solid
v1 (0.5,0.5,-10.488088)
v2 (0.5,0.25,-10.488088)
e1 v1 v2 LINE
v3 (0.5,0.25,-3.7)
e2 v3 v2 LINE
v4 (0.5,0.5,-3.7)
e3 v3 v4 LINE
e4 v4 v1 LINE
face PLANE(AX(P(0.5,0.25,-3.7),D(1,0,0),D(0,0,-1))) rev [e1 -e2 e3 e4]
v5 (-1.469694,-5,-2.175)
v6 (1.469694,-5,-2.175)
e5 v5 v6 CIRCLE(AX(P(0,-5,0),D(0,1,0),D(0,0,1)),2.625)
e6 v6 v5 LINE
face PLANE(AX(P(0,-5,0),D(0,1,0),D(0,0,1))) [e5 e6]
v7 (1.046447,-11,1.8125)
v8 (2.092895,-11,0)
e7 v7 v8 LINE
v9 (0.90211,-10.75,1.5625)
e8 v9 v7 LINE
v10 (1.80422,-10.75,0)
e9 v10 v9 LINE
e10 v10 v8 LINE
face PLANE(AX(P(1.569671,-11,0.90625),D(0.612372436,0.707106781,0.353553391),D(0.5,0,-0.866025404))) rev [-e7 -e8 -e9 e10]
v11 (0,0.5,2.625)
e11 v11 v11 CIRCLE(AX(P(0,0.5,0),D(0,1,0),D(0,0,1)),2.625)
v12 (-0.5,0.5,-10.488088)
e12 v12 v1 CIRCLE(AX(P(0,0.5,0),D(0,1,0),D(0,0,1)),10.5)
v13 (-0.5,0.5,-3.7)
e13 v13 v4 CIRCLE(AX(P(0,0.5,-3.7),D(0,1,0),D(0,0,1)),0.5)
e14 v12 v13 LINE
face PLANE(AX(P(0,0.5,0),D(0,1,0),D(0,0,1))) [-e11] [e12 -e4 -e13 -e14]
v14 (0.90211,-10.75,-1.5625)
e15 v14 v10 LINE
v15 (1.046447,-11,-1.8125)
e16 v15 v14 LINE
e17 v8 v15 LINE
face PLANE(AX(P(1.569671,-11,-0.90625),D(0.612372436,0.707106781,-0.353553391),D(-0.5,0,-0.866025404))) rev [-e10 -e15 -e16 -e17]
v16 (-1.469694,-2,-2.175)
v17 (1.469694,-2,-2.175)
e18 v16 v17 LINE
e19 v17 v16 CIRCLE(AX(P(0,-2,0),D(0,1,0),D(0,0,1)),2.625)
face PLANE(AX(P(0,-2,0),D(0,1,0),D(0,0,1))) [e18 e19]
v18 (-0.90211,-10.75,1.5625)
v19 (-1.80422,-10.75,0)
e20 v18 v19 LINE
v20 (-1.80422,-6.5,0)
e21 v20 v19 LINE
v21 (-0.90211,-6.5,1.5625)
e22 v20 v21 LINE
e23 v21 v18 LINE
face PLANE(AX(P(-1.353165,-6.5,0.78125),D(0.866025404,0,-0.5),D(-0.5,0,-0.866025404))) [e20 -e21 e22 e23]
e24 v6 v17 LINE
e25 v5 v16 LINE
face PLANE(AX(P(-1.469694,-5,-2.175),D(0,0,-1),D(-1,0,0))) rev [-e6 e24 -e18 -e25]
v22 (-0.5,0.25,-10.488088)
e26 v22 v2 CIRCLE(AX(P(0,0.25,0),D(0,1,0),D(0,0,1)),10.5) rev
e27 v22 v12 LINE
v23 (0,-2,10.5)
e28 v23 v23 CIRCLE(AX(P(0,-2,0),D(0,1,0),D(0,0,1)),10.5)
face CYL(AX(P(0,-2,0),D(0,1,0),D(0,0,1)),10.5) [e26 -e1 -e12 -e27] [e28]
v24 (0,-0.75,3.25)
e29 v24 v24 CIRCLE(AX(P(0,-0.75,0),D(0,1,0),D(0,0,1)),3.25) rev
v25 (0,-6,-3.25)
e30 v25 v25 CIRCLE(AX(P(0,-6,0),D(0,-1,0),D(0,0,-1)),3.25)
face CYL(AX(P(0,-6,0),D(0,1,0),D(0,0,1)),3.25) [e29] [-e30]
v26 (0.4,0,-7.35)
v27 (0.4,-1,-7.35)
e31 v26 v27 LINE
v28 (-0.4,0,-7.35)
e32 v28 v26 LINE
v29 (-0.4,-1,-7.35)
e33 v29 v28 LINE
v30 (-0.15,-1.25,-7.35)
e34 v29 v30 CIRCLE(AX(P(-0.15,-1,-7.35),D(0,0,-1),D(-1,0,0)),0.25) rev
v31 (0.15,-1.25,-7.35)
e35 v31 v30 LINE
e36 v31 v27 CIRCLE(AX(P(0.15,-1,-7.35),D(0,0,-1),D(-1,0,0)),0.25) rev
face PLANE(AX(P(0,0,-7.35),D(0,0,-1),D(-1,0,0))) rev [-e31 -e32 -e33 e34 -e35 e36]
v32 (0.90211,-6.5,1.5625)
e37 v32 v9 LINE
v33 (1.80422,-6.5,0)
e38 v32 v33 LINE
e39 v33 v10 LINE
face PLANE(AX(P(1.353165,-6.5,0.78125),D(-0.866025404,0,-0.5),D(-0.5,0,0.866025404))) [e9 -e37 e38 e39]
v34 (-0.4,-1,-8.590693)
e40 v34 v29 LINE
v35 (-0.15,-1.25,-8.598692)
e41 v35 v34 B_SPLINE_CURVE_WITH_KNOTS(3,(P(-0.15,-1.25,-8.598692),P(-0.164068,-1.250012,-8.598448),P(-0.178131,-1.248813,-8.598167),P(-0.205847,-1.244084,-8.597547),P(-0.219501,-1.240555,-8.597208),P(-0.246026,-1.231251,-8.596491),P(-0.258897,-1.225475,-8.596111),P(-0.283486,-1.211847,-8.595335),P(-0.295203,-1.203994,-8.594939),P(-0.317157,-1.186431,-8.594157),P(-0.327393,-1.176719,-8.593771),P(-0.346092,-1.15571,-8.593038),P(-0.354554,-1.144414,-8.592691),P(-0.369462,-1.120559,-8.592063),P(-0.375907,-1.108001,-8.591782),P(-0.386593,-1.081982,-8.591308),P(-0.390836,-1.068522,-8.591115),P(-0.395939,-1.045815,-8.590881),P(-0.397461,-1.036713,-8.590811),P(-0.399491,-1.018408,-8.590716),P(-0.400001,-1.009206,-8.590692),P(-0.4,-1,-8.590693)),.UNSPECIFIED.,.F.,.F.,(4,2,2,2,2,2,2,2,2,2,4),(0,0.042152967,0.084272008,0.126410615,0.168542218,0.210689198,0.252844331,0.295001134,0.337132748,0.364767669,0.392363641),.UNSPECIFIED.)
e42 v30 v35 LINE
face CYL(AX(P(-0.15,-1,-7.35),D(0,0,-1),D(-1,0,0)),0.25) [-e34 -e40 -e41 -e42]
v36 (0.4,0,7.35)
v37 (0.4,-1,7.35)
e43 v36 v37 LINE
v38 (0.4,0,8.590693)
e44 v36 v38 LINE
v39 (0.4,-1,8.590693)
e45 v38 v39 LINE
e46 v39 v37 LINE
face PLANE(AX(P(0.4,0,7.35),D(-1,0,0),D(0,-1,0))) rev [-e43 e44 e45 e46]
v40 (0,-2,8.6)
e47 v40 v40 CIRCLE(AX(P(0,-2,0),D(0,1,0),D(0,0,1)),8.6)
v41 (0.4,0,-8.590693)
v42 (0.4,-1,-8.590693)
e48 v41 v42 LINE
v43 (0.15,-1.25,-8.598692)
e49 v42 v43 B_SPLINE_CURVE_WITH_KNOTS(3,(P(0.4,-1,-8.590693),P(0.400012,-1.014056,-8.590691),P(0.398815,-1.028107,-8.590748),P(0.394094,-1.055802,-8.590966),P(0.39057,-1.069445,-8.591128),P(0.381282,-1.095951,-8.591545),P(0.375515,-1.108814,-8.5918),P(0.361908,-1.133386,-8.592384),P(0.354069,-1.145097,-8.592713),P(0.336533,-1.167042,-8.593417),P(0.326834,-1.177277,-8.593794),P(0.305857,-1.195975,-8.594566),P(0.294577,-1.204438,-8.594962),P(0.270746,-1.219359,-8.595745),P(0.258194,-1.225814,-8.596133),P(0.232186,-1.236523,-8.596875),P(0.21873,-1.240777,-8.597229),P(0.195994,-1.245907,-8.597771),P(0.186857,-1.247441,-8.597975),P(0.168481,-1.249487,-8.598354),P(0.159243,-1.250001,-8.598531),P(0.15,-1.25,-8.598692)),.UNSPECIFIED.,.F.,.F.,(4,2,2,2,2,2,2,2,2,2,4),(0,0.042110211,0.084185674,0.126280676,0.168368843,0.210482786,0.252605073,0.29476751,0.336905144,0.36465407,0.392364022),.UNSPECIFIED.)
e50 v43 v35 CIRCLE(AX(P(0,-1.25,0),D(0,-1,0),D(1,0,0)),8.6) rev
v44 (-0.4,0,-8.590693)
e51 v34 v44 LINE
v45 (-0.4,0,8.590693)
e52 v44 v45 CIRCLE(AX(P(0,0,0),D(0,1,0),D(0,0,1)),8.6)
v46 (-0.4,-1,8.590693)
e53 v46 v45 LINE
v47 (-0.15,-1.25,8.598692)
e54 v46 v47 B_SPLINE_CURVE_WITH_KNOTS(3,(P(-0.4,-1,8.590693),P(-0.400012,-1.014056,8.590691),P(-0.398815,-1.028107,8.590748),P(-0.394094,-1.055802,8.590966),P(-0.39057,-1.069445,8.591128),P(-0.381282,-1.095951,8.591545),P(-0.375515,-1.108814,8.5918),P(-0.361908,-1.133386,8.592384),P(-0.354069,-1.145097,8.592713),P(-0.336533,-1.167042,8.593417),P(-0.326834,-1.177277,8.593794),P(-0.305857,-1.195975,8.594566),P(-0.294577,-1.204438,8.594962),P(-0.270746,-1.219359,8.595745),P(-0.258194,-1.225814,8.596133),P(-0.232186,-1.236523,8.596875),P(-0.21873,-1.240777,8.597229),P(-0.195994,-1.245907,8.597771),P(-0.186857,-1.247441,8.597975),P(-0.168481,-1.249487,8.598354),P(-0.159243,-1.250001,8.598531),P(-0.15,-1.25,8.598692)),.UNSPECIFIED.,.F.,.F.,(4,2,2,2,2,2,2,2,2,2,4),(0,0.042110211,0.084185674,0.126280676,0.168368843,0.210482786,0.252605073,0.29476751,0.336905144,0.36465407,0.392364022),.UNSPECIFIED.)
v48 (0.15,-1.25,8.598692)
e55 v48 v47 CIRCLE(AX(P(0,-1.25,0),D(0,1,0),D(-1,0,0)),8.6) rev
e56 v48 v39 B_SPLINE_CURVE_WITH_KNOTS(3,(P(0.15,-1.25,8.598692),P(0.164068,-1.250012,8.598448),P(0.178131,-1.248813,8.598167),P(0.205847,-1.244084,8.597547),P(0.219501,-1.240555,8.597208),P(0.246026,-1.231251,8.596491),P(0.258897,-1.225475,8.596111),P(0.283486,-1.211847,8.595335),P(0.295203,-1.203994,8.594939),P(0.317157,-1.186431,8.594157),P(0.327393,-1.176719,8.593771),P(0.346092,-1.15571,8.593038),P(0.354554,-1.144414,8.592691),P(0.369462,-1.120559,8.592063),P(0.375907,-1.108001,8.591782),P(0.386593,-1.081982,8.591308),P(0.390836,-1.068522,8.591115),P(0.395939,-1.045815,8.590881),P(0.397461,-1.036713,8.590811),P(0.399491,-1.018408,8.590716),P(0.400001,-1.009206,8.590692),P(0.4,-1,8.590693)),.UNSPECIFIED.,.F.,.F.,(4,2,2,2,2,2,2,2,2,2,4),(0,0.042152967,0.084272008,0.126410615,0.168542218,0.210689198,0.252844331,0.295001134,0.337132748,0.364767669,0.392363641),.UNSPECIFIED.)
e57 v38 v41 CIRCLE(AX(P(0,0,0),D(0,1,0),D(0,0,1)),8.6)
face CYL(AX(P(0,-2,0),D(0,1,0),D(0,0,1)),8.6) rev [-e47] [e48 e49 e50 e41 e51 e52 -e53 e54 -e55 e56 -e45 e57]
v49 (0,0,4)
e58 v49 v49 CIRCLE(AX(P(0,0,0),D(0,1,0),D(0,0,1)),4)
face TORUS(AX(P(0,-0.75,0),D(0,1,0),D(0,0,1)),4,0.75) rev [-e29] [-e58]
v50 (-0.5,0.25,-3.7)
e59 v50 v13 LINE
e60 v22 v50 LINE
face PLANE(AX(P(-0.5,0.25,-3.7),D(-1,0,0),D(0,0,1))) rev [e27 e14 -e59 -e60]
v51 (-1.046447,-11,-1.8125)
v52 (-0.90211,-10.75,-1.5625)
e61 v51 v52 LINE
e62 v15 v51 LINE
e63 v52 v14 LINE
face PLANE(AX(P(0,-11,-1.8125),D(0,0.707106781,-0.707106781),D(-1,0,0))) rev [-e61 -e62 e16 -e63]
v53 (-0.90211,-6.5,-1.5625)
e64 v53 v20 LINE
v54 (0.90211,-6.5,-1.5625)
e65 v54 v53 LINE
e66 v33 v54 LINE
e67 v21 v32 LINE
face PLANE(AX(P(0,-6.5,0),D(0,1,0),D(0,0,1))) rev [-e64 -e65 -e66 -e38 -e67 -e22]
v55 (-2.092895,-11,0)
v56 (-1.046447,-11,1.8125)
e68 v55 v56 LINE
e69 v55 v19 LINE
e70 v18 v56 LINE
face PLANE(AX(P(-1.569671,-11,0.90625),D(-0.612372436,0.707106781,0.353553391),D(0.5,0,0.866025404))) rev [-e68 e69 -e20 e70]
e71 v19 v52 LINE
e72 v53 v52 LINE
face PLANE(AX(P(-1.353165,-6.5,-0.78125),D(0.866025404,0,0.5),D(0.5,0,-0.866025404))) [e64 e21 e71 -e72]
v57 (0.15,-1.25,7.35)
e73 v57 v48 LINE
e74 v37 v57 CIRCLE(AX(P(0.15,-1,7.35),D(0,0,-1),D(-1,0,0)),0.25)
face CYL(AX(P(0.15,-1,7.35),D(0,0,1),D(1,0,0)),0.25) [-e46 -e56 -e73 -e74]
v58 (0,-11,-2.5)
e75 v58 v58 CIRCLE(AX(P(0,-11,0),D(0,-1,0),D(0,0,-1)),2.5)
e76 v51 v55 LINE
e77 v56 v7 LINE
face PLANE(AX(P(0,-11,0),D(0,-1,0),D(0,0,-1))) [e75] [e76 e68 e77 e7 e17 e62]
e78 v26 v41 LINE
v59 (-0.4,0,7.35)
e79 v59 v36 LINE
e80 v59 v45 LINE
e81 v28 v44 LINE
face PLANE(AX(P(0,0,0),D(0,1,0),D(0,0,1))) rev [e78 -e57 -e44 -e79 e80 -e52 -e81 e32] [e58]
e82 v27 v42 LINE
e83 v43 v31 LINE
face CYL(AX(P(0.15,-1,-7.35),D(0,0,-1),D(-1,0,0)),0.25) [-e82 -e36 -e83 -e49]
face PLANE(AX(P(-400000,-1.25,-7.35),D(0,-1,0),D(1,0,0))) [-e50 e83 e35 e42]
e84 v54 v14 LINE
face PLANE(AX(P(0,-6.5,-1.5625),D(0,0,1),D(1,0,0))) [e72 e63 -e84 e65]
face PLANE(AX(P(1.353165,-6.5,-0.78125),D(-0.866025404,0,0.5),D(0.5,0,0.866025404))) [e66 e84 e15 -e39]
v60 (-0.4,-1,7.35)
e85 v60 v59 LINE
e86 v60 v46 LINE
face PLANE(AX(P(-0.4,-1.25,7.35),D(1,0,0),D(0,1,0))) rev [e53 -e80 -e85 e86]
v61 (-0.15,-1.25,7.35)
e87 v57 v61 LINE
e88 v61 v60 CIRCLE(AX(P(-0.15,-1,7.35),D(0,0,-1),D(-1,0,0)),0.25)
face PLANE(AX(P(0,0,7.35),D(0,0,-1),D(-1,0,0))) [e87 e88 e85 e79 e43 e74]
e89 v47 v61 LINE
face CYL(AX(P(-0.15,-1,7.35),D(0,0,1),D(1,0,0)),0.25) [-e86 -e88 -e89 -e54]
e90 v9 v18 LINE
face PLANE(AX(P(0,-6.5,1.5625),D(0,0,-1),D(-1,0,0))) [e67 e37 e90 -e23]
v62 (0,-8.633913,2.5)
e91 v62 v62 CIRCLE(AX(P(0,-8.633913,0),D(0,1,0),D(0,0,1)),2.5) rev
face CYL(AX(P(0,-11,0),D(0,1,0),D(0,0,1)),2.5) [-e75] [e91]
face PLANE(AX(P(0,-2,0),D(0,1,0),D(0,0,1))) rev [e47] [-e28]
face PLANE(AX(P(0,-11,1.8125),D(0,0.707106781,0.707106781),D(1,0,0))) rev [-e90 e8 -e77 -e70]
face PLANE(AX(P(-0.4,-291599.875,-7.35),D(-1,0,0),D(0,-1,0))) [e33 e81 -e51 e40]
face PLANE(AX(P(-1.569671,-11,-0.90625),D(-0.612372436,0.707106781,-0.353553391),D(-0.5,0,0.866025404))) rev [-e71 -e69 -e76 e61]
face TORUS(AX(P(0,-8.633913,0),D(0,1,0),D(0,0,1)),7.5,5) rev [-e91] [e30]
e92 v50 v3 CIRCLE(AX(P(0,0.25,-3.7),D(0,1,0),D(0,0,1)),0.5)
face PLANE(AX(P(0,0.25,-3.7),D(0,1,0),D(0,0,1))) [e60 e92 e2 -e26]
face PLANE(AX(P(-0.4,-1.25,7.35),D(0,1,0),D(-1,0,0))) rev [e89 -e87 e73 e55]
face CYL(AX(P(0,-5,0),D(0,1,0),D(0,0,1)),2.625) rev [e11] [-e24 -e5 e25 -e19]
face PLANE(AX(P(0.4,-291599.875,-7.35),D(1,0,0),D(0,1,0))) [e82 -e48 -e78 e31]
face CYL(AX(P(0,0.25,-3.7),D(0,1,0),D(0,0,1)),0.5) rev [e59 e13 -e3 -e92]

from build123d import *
from build123d.topology import SkipClean

# Parameters (mm, degrees)
SKETCH1_R           = 10.5
SKETCH1_R_2         = 8.6
BOSS_EXTRUDE1_DEPTH = 2
SKETCH2_W           = 0.8
SKETCH2_H           = 1.25
BOSS_EXTRUDE2_DEPTH = 1.25
BOSS_EXTRUDE3_START = 17.2
SKETCH2_2_W         = 0.8
SKETCH2_2_H         = 1.25
BOSS_EXTRUDE3_DEPTH = 1.25
BOSS_EXTRUDE4_START = 0.5
SKETCH3_R           = 10.5
BOSS_EXTRUDE4_DEPTH = 0.5
SKETCH5_R           = 3.25
BOSS_EXTRUDE5_DEPTH = 6
FILLET2_R           = 0.75
CUT_EXTRUDE1_DEPTH  = 5.5
FILLET1_R           = 0.25
SKETCH7_R           = 2.625
CUT_EXTRUDE2_DEPTH  = 2.5
CUT_EXTRUDE3_DEPTH  = 0.25
SKETCH11_R          = 2.5
BOSS_EXTRUDE6_DEPTH = 5
CUT_EXTRUDE4_START  = 5
CUT_EXTRUDE4_DEPTH  = 4.5
CHAMFER2_SIZE       = 0.25
FILLET3_R           = 5


with BuildPart() as part:
    # Sketch1 → Boss-Extrude1 (new body)
    with BuildSketch(Plane(origin=(0, 0, 0), x_dir=(1, 0, 0), z_dir=(0, 1, 0))):
        with Locations(Location((0, 0, 0), (0, 0, 270))):
            Circle(SKETCH1_R)
        with Locations(Location((0, 0, 0), (0, 0, 270))):
            Circle(SKETCH1_R_2, mode=Mode.SUBTRACT)
    extrude(amount=-BOSS_EXTRUDE1_DEPTH)

    # Sketch2 → Boss-Extrude2 (add)
    with BuildSketch(Plane(origin=(0, 0, 8.6), x_dir=(-1, 0, 0), z_dir=(0, 0, -1))):
        with Locations((0, -0.625)):
            Rectangle(SKETCH2_W, SKETCH2_H)
    extrude(amount=BOSS_EXTRUDE2_DEPTH)

    # Sketch2<2> → Boss-Extrude3 (add)
    with BuildSketch(Plane(origin=(0, 0, 8.6), x_dir=(-1, 0, 0), z_dir=(0, 0, -1)).offset(BOSS_EXTRUDE3_START)):
        with Locations((0, -0.625)):
            Rectangle(SKETCH2_2_W, SKETCH2_2_H)
    extrude(amount=-BOSS_EXTRUDE3_DEPTH)

    # Sketch3 → Boss-Extrude4 (add)
    with BuildSketch(Plane(origin=(0, 0, 0), x_dir=(1, 0, 0), z_dir=(0, 1, 0)).offset(BOSS_EXTRUDE4_START)):
        with Locations(Location((0, 0, 0), (0, 0, 270))):
            Circle(SKETCH3_R)
    extrude(amount=-BOSS_EXTRUDE4_DEPTH)

    # Sketch5 → Boss-Extrude5 (add)
    with BuildSketch(Plane.XZ):
        with Locations(Location((0, 0, 0), (0, 0, 90))):
            Circle(SKETCH5_R)
    extrude(amount=BOSS_EXTRUDE5_DEPTH)

    # Fillet2
    fillet2_edges = [part.edges().sort_by_distance(p)[0] for p in [
        (0, 0, -3.25),
    ]]
    fillet(fillet2_edges, radius=FILLET2_R)

    # Sketch4 → Cut-Extrude1 (cut)
    with BuildSketch(Plane(origin=(0, 0.5, 0), x_dir=(1, 0, 0), z_dir=(0, 1, 0))):
        with BuildLine():
            Line((-1.469693846, 2.175), (1.469693846, 2.175))
            ThreePointArc((1.469693846, 2.175), (0, -2.625), (-1.469693846, 2.175))
        make_face()
    extrude(amount=-CUT_EXTRUDE1_DEPTH, mode=Mode.SUBTRACT)

    # Fillet1
    fillet1_edges = [part.edges().sort_by_distance(p)[0] for p in [
        (-0.4, -1.25, 7.970346319),
        (0.4, -1.25, 7.970346319),
        (-0.4, -1.25, -7.970346319),
        (0.4, -1.25, -7.970346319),
    ]]
    fillet(fillet1_edges, radius=FILLET1_R)

    # Sketch7 → Cut-Extrude2 (cut)
    with SkipClean():  # the faces are left unmerged after this step: merging them gives an invalid solid
        with BuildSketch(Plane(origin=(0, 0.5, 0), x_dir=(1, 0, 0), z_dir=(0, 1, 0))):
            with Locations(Location((0, 0, 0), (0, 0, 270))):
                Circle(SKETCH7_R)
        extrude(amount=-CUT_EXTRUDE2_DEPTH, mode=Mode.SUBTRACT)

    # Sketch9 → Cut-Extrude3 (cut)
    with SkipClean():  # the faces are left unmerged after this step: merging them gives an invalid solid
        with BuildSketch(Plane(origin=(0, 0.5, 0), x_dir=(1, 0, 0), z_dir=(0, 1, 0))):
            with BuildLine():
                Line((-0.5, 3.7), (-0.5, 13.7))
                ThreePointArc((-0.5, 13.7), (0, 14.2), (0.5, 13.7))
                Line((0.5, 13.7), (0.5, 3.7))
                ThreePointArc((0.5, 3.7), (0, 3.2), (-0.5, 3.7))
            make_face()
        extrude(amount=-CUT_EXTRUDE3_DEPTH, mode=Mode.SUBTRACT)

    # Sketch11 → Boss-Extrude6 (add)
    with SkipClean():  # the faces are left unmerged after this step: merging them gives an invalid solid
        with BuildSketch(Plane.XZ.offset(6)):
            with Locations(Location((0, 0, 0), (0, 0, 270))):
                Circle(SKETCH11_R)
        extrude(amount=BOSS_EXTRUDE6_DEPTH)

    # Sketch10 → Cut-Extrude4 (cut)
    with SkipClean():  # the faces are left unmerged after this step: merging them gives an invalid solid
        with BuildSketch(Plane.XZ.offset(6).offset(CUT_EXTRUDE4_START)):
            Polygon((1.804219591, 0), (0.902109796, 1.5625), (-0.902109796, 1.5625), (-1.804219591, 0), (-0.902109796, -1.5625), (0.902109796, -1.5625), align=None)
        extrude(amount=-CUT_EXTRUDE4_DEPTH, mode=Mode.SUBTRACT)

    # Chamfer2
    chamfer2_edges = [part.edges().sort_by_distance(p)[0] for p in [
        (-1.353164693, -11, -0.78125),
        (-1.353164693, -11, 0.78125),
        (0, -11, 1.5625),
        (1.353164693, -11, 0.78125),
        (1.353164693, -11, -0.78125),
        (0, -11, -1.5625),
    ]]
    chamfer(chamfer2_edges, length=CHAMFER2_SIZE)

    # Fillet3
    # the kernel refuses this fillet: 5 mm, written as the material it adds along each edge
    with BuildSketch(Plane(origin=(0, -6, 0), x_dir=(0, 0, -1), z_dir=(-1, 0, 0))) as fillet3_piece_1:
        with BuildLine():
            CenterArc((7.5, 2.633913438), FILLET3_R, 180, 31.788330617)
            Line((3.25, 0), (3.165, -0.052678269))
            ThreePointArc((3.165, -0.052678269), (2.875, -0.1), (2.5, -0.1))
            Line((2.5, -0.1), (2.4, 0))
            Line((2.4, 0), (2.4, 2.633913438))
            Line((2.4, 2.633913438), (2.5, 2.633913438))
        make_face()
    revolve(axis=Axis((0, -6, 0), (0, -1, 0)))


solid = part.part
